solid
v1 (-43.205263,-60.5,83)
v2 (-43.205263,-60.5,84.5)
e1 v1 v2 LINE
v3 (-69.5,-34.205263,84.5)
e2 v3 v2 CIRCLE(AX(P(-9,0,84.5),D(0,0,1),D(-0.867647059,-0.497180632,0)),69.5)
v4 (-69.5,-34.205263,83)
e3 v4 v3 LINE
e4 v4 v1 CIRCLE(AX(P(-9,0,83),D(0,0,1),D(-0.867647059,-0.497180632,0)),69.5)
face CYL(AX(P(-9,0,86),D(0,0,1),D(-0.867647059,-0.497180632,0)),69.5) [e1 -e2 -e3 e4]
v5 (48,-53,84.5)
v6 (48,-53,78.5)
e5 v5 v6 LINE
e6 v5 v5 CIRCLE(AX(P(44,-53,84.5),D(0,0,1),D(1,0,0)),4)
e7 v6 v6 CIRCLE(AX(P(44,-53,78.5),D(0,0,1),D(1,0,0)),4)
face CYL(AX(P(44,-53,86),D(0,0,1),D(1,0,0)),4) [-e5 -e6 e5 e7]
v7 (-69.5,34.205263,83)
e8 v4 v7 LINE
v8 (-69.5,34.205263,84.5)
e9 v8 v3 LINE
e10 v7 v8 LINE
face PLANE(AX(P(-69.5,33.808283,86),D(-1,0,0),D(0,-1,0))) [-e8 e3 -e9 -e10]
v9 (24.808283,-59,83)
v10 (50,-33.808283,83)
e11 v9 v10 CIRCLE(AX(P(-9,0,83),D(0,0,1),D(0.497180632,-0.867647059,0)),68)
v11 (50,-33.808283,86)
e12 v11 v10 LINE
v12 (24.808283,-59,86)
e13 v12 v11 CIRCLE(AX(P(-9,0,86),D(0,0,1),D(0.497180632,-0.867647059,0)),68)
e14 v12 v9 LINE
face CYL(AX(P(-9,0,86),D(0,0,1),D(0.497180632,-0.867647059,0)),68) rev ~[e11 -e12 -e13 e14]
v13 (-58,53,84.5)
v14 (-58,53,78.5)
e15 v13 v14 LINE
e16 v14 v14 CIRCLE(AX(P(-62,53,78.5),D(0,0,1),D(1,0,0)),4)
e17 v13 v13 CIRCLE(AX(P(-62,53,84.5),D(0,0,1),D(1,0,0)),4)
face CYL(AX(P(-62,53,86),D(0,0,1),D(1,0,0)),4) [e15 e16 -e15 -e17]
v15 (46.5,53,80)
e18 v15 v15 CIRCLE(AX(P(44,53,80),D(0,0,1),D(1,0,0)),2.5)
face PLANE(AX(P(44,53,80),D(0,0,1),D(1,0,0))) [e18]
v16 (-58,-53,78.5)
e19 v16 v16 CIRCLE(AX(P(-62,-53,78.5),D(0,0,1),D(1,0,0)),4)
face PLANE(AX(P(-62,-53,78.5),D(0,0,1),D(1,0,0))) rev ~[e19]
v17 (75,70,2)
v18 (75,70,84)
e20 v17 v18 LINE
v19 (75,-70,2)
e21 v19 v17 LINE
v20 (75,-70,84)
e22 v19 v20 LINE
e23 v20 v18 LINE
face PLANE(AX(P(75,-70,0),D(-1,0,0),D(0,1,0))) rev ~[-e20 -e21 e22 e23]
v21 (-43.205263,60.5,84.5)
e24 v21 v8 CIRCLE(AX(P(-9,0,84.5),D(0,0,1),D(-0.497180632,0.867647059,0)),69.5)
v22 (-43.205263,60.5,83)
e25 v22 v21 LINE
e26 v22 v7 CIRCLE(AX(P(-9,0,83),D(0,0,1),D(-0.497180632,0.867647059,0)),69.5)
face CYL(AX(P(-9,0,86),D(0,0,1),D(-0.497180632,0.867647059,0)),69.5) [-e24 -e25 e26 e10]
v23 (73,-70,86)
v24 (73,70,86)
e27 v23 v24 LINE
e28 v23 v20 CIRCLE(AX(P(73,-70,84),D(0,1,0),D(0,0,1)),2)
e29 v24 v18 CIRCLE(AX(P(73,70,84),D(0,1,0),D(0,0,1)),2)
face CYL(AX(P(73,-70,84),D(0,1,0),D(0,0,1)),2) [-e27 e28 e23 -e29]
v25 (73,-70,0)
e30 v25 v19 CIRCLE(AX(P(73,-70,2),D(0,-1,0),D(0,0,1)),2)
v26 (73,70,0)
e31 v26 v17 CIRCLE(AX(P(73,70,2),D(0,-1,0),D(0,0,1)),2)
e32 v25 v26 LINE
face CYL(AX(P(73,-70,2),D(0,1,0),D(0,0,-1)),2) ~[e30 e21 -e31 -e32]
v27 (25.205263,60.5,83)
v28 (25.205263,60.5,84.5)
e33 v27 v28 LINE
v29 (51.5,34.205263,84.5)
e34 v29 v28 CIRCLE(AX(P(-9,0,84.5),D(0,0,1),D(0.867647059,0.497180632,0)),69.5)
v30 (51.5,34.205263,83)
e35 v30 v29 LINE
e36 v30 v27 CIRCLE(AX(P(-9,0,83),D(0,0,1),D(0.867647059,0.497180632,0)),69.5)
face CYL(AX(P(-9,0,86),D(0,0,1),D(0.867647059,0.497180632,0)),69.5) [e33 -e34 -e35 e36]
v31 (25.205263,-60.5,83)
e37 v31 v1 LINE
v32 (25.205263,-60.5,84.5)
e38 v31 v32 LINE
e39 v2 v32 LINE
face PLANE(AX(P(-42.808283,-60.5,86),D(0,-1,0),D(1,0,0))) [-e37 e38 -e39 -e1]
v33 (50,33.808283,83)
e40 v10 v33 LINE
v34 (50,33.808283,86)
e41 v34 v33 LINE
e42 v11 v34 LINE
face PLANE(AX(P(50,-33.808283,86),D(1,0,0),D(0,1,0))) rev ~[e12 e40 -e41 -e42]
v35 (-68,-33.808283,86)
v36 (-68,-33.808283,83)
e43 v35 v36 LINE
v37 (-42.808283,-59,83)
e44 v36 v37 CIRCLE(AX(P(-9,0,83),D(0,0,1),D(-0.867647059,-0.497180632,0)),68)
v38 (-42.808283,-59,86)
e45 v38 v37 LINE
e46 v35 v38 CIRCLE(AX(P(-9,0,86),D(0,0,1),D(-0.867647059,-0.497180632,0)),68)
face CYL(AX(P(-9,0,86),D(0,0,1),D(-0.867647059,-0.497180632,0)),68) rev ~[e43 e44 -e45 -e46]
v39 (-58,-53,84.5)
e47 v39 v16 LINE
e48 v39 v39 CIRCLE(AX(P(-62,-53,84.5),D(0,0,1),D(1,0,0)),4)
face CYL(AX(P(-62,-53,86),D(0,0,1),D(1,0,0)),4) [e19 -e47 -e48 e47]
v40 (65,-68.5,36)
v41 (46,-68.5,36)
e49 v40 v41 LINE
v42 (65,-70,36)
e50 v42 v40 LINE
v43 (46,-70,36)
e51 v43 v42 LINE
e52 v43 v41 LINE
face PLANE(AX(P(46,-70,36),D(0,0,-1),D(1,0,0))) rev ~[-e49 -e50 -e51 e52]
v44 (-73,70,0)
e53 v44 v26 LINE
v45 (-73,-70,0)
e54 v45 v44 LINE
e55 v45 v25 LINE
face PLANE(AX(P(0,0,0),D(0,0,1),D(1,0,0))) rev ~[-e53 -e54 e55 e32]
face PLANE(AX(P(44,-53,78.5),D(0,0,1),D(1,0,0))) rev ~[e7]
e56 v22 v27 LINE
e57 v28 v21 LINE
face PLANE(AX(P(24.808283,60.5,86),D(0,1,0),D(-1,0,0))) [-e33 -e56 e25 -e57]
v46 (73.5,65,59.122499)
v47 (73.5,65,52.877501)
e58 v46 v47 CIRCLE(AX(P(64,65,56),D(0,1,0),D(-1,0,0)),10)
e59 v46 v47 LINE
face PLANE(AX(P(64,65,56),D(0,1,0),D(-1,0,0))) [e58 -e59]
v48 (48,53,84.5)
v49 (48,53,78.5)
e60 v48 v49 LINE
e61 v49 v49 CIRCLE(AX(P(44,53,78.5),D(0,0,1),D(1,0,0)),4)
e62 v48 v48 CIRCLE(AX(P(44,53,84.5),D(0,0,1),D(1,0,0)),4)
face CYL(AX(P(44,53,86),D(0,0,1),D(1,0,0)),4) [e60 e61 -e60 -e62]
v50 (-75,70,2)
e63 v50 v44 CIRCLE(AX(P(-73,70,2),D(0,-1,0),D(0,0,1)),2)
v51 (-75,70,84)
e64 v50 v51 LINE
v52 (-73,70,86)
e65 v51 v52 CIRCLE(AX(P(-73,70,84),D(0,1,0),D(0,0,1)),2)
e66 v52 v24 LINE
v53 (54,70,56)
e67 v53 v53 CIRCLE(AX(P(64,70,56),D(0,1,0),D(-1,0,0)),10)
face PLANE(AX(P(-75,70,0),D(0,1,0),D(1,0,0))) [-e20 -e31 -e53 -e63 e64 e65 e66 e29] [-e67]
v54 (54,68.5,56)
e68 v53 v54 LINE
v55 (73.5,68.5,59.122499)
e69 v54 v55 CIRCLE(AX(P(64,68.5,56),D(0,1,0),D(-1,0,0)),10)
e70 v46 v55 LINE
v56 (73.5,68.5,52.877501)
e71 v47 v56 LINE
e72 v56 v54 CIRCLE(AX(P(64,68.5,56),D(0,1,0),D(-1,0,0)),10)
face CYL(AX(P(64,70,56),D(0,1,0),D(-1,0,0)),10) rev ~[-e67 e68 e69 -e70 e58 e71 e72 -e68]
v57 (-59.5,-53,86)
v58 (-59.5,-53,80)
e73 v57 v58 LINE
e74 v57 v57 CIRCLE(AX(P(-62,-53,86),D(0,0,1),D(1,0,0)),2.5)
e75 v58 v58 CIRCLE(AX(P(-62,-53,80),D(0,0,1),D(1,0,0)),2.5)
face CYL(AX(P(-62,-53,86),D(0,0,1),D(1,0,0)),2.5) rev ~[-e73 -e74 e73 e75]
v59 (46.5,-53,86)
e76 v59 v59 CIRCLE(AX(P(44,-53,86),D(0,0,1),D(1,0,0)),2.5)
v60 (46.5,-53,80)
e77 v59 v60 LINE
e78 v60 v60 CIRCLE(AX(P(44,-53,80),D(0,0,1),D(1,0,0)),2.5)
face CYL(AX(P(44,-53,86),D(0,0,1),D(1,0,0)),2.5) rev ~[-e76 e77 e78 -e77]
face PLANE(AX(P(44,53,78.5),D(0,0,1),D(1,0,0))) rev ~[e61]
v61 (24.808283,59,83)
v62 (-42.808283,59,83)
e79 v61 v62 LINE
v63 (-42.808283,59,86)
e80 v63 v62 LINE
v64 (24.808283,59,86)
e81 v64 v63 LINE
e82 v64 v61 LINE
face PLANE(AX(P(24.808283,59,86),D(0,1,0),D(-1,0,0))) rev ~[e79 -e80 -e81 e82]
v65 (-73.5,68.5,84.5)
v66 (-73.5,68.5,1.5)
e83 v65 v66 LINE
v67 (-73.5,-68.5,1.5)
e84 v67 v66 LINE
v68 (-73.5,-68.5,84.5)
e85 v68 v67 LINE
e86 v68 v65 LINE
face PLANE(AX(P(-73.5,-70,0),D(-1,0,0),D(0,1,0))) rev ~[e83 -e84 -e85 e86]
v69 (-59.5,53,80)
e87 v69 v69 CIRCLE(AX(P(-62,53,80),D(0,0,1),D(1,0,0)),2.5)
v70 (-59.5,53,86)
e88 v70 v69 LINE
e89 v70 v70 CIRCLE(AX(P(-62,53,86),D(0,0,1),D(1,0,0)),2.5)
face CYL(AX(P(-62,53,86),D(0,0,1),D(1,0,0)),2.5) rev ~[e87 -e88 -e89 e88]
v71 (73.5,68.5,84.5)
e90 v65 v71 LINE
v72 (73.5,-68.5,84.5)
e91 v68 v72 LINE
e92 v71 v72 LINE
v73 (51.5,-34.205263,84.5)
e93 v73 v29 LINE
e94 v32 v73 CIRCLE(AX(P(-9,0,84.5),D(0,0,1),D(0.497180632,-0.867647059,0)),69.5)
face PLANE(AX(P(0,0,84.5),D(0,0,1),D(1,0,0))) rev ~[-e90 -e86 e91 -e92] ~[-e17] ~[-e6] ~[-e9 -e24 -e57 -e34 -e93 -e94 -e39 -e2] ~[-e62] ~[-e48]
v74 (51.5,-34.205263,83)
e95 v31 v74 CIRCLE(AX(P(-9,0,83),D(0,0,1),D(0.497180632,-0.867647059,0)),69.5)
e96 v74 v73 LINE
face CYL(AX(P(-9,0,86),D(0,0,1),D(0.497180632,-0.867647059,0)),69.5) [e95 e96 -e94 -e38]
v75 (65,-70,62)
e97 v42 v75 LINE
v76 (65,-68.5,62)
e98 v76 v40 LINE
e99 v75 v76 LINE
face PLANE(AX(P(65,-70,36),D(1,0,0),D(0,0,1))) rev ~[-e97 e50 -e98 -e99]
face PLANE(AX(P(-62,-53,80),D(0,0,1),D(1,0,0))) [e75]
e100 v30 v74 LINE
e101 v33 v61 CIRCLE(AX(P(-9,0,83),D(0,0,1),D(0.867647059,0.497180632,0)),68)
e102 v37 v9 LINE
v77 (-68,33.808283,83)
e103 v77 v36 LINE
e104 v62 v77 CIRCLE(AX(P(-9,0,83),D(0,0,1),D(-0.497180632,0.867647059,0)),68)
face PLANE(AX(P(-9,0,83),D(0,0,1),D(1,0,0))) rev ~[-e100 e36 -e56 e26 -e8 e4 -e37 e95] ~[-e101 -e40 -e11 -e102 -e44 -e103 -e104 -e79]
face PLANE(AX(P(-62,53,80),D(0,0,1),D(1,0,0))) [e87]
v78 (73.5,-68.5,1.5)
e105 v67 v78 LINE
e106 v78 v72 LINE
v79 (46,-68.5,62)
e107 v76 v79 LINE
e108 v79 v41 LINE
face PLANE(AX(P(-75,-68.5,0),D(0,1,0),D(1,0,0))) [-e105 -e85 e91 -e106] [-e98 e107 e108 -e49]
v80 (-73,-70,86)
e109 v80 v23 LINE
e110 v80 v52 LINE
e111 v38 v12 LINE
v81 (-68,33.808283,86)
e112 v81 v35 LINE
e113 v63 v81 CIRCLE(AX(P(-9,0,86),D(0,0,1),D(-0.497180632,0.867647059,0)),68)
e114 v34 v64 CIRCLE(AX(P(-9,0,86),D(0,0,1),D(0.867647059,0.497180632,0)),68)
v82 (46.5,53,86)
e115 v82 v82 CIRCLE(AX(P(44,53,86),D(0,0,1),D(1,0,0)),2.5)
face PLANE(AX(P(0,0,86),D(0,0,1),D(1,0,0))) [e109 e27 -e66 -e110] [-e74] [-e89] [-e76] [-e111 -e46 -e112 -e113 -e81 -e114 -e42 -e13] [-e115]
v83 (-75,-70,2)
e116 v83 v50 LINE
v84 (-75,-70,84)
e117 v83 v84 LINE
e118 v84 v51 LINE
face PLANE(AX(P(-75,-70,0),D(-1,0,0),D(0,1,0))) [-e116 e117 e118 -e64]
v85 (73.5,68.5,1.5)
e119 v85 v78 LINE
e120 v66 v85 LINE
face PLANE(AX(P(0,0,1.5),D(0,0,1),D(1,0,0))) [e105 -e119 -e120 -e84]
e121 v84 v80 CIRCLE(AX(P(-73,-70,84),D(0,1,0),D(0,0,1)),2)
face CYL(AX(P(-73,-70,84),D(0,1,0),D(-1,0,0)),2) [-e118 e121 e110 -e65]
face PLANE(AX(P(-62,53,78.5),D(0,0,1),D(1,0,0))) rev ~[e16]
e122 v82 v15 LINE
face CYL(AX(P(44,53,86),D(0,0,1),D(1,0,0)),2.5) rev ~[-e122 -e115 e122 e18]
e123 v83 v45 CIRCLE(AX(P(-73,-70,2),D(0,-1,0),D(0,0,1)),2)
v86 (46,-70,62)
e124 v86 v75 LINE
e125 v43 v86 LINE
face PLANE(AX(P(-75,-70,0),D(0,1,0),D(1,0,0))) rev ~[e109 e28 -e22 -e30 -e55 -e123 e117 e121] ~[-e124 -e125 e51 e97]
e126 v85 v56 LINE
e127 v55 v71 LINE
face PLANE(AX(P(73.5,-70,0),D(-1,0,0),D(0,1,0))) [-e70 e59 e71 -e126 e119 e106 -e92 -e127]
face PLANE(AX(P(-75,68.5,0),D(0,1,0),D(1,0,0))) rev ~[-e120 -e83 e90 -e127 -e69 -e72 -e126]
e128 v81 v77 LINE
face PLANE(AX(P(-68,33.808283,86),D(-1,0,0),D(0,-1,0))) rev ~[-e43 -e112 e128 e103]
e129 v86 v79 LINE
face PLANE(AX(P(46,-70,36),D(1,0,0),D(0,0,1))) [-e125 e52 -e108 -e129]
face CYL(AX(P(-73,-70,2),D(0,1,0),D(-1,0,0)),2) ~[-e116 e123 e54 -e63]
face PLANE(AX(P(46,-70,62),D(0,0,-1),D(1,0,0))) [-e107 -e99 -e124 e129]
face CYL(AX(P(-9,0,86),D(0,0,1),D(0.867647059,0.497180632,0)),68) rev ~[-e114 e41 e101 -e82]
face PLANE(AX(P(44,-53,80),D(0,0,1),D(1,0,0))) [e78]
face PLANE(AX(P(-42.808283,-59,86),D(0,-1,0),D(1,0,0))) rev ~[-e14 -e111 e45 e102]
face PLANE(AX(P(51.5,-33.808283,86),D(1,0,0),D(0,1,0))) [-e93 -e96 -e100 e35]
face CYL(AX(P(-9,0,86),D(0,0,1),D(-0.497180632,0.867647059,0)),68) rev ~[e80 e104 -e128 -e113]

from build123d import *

# Parameters (mm, degrees)
F0_W     = 150
F0_H     = 140
F1_DEPTH = 86
F3_DEPTH = 3
F2_R     = 2.5
F4_DEPTH = 6
F5_T     = -1.5
F6_W     = 19
F6_H     = 26
F7_DEPTH = 10
F8_R     = 10
F9_DEPTH = 5
F10_R    = 2


# Not quite as in the source:
# - a shell that OpenCascade refuses in one call is made with other operations: the cavity is built on its own and cut out


with BuildPart() as f1:
    # F0 (on Top) → F1 (new body)
    with BuildSketch(Plane.XY):
        Rectangle(F0_W, F0_H)
    extrude(amount=F1_DEPTH)

    # F2 (on face) → F3 (cut)
    with BuildSketch(Plane.XY.offset(86)):
        with BuildLine():
            Line((24.8082830088, 59), (-42.8082830088, 59))
            ThreePointArc((-42.8082830088, 59), (-57.0832611207, 48.0832611207), (-68, 33.8082830088))
            Line((-68, 33.8082830088), (-68, -33.8082830088))
            ThreePointArc((-68, -33.8082830088), (-57.0832611207, -48.0832611207), (-42.8082830088, -59))
            Line((-42.8082830088, -59), (24.8082830088, -59))
            ThreePointArc((24.8082830088, -59), (39.0832611207, -48.0832611207), (50, -33.8082830088))
            Line((50, -33.8082830088), (50, 33.8082830088))
            ThreePointArc((50, 33.8082830088), (39.0832611207, 48.0832611207), (24.8082830088, 59))
        make_face()
    extrude(amount=-F3_DEPTH, mode=Mode.SUBTRACT)

    # F2 (on face) → F4 (cut)
    with BuildSketch(Plane.XY.offset(86)):
        with Locations((-62, 53)):
            Circle(F2_R)
        with Locations((44, 53)):
            Circle(F2_R)
        with Locations((44, -53)):
            Circle(F2_R)
        with Locations((-62, -53)):
            Circle(F2_R)
    extrude(amount=-F4_DEPTH, mode=Mode.SUBTRACT)

    # F5: a shell. OpenCascade refuses it in one call, so the cavity is built on its own and cut out:
    # the body offset inwards by the wall thickness, plus a prism from it out through each open face.
    f5_core = offset(f1.part, amount=F5_T, kind=Kind.INTERSECTION, mode=Mode.PRIVATE)
    f5_exits = [f5_core.faces().sort_by_distance(p)[0] for p in [
        (-9, 0, 81.5),
    ]]
    add(f5_core, mode=Mode.SUBTRACT)
    extrude(f5_exits, amount=-F5_T, mode=Mode.SUBTRACT)

    # F6 (on face) → F7 (cut)
    with BuildSketch(Plane.XZ.offset(70)):
        with Locations((55.5, 49)):
            Rectangle(F6_W, F6_H)
    extrude(amount=-F7_DEPTH, mode=Mode.SUBTRACT)

    # F8 (on face) → F9 (cut)
    with BuildSketch(Plane(origin=(0, 70, 0), x_dir=(-1, 0, 0), z_dir=(0, 1, 0))):
        with Locations((-64, 56)):
            Circle(F8_R)
    extrude(amount=-F9_DEPTH, mode=Mode.SUBTRACT)

    # F10
    f10_edges = [f1.edges().sort_by_distance(p)[0] for p in [
        (75, 0, 86),
        (75, 0, 0),
        (-75, 0, 86),
        (-75, 0, 0),
    ]]
    fillet(f10_edges, radius=F10_R)


solid = f1.part
